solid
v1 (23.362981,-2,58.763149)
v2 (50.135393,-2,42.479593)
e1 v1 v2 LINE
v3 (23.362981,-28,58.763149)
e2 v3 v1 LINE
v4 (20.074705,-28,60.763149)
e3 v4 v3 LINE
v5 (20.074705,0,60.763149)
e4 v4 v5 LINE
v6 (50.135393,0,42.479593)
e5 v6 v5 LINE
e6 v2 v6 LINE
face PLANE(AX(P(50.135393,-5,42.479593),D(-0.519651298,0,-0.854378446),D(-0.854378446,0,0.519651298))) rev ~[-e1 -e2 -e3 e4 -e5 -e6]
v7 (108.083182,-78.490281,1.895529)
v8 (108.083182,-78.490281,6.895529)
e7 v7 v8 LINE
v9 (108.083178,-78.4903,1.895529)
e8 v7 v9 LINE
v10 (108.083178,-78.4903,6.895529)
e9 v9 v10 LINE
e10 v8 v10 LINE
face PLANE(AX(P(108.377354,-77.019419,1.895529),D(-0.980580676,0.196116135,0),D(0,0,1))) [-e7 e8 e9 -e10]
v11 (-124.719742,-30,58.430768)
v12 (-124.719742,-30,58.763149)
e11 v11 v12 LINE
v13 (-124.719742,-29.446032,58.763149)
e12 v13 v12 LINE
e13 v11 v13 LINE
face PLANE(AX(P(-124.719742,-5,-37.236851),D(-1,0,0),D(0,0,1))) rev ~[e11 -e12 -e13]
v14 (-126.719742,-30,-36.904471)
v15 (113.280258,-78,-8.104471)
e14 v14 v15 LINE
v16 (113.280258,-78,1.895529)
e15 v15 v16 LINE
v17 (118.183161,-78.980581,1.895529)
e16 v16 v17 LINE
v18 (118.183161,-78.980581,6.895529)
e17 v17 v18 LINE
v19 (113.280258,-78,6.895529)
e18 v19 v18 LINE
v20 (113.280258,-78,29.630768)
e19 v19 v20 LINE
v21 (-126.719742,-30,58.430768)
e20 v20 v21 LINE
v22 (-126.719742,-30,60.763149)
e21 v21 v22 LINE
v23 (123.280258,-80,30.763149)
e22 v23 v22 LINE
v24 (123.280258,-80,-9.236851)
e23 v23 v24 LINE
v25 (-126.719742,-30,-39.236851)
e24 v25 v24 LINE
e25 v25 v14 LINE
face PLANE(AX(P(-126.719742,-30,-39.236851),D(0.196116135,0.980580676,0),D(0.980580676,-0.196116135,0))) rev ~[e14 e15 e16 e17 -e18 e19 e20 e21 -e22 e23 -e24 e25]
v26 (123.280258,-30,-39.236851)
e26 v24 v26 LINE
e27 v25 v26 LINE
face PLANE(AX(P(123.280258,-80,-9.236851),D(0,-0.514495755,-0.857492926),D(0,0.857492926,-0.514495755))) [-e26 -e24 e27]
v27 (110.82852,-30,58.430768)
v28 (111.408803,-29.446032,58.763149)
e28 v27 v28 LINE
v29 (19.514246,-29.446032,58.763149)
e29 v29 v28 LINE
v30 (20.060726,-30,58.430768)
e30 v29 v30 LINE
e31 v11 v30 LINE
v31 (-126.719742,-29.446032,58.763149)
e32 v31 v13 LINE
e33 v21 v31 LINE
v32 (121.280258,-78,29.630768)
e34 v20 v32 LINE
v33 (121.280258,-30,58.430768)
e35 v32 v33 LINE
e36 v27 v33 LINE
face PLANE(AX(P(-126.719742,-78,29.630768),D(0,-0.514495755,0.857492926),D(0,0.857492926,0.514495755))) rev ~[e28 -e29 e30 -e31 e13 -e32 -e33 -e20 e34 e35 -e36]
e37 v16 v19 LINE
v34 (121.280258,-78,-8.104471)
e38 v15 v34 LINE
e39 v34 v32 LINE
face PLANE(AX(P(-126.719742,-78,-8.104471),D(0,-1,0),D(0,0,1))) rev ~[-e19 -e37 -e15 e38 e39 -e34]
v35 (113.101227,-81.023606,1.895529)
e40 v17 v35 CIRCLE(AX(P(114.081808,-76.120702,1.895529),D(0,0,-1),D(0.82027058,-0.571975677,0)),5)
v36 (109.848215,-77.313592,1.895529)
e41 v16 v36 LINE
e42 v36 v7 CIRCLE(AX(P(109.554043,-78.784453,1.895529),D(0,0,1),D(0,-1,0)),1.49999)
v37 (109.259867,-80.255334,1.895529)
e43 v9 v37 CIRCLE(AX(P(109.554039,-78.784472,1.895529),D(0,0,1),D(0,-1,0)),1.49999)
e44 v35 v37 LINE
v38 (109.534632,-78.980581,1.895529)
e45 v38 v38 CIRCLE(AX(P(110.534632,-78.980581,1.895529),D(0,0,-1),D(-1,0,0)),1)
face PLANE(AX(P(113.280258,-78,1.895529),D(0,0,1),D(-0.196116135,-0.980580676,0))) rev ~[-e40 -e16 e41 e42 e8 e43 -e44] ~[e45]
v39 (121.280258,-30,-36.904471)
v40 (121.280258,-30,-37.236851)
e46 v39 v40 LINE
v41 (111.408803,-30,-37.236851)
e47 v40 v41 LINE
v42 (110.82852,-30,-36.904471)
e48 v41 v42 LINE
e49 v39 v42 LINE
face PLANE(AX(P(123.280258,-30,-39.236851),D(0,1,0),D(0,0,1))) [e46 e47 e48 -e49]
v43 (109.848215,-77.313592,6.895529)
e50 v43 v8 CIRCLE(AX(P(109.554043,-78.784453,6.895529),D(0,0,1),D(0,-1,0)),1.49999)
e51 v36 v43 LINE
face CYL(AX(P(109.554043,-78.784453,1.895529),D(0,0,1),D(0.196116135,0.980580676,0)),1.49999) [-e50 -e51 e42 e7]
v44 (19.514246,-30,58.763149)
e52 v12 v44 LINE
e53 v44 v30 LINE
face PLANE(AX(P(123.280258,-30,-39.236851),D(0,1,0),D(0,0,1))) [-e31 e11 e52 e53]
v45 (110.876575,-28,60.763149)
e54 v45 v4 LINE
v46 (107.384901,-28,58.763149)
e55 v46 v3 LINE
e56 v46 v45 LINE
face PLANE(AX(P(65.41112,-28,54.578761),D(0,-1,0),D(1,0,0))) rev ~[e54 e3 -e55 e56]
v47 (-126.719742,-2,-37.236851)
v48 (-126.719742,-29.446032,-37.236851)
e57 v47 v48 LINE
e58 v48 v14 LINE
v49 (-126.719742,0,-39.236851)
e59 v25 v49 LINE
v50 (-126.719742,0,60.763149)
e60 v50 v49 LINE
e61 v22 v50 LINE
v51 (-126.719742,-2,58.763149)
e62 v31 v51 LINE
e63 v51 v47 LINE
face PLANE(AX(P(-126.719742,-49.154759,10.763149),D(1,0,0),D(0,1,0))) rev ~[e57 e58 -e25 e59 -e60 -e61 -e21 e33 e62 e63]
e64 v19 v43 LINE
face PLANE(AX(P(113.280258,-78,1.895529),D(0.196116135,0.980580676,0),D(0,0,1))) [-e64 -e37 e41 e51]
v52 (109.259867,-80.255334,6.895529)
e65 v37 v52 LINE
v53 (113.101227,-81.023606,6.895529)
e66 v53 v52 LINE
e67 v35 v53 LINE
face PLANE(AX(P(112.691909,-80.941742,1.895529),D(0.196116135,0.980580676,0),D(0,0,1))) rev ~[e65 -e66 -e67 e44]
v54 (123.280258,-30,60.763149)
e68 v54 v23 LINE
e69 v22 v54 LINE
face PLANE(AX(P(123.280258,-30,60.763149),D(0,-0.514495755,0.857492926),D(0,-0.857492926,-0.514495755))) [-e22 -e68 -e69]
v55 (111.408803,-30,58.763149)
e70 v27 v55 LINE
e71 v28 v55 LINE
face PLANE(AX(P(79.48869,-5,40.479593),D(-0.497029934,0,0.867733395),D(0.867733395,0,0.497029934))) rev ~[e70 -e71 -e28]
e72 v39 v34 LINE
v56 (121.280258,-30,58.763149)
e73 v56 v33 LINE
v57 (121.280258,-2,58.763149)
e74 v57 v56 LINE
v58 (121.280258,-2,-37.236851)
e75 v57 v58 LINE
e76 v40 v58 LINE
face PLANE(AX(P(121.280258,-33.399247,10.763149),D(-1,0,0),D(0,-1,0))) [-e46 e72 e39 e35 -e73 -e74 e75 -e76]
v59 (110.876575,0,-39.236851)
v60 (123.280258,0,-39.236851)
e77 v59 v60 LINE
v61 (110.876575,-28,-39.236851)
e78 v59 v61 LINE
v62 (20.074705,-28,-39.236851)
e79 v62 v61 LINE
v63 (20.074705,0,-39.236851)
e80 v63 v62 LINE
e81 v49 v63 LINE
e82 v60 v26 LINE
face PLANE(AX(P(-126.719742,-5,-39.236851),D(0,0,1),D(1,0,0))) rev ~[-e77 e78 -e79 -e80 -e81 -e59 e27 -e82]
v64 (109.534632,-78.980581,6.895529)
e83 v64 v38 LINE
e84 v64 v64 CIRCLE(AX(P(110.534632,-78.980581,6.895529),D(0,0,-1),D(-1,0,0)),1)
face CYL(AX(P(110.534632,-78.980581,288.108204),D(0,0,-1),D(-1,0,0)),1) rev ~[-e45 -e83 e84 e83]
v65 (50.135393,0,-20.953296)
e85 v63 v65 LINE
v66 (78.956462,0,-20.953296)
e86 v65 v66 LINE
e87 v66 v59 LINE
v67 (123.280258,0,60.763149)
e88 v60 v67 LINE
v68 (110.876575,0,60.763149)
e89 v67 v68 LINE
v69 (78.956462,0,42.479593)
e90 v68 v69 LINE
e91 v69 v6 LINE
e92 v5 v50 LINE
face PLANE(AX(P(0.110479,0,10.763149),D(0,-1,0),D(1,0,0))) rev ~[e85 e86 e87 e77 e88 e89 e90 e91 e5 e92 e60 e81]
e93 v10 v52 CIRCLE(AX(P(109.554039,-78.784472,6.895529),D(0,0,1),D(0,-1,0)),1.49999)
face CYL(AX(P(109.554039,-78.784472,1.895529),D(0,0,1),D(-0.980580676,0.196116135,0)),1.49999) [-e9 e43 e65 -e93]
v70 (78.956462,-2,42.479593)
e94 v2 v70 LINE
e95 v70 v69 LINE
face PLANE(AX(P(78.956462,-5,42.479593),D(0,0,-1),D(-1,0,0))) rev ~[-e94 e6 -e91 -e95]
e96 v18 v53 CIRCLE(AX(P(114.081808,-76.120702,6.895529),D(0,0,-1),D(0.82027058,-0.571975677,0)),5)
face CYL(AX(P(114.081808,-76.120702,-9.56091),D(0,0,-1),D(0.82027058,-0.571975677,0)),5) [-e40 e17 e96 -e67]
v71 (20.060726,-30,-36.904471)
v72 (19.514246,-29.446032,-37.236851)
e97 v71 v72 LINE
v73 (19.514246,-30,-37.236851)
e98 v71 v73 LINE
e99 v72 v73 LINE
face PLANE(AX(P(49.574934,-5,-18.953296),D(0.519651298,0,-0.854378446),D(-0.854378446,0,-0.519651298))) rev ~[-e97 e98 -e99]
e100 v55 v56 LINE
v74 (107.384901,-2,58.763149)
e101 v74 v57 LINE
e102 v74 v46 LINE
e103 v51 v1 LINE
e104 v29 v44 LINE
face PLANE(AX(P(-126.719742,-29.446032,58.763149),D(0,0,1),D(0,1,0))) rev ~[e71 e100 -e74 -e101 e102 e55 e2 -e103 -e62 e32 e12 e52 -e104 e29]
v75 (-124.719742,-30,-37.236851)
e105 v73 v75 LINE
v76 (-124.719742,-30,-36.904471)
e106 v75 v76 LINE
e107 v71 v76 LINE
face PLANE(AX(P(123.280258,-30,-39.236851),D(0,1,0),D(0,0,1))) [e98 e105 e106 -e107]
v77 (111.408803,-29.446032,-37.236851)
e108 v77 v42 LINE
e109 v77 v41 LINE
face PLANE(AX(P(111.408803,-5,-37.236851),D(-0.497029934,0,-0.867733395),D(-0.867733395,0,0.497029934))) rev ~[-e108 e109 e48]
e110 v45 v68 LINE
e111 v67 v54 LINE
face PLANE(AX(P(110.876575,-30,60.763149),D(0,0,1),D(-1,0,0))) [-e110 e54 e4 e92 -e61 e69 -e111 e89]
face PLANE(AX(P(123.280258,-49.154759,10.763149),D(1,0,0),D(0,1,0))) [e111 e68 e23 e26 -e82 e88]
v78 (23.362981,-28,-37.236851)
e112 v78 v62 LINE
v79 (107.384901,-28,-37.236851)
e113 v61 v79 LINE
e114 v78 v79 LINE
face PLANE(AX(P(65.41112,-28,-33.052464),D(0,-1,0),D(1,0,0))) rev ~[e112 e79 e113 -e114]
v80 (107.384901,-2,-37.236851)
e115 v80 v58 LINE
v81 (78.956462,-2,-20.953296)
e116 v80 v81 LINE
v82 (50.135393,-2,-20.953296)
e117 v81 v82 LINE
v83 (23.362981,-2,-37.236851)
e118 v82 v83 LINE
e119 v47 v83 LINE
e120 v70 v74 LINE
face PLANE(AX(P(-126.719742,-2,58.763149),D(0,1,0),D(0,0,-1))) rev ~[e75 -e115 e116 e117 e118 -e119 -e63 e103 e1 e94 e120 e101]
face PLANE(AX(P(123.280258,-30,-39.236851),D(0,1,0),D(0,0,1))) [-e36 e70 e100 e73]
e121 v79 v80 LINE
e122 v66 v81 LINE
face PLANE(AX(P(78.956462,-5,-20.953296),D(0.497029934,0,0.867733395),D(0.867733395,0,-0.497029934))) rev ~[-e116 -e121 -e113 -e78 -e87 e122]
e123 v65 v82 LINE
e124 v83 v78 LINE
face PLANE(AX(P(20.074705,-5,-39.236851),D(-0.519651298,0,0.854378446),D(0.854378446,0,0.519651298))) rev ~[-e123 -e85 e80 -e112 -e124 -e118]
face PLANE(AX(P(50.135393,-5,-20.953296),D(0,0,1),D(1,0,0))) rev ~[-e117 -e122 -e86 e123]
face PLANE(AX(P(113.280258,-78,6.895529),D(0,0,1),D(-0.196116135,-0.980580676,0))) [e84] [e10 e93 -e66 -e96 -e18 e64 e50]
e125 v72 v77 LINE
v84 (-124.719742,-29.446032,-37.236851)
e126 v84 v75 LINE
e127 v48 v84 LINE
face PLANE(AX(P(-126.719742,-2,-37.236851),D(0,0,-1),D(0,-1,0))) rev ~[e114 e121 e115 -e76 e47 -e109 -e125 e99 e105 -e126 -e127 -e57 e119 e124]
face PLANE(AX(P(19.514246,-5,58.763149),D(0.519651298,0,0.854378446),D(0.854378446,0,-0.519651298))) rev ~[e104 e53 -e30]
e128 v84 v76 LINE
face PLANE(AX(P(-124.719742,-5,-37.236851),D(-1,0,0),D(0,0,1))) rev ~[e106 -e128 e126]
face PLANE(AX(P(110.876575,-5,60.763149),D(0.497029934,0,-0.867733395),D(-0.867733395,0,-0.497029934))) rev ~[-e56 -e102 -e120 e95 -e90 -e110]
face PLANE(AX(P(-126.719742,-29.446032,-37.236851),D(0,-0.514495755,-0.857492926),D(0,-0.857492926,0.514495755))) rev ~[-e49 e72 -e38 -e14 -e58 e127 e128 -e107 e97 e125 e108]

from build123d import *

# Parameters (mm, degrees)
F1_DEPTH     = 5
F3_DEPTH     = 25
F5_DEPTH     = 2
F7_DEPTH     = 250
F9_DEPTH     = 248
F11_DEPTH    = 110
F13_W        = 5
F13_H        = 5
F14_DEPTH    = 3
F15_T1_DEPTH = 27.9128784748
F16_DEPTH    = 5
F18_D        = 2
F19_R        = 1.49999


# Not quite as in the source:
# - a fillet or chamfer that OpenCascade refuses, or shapes differently, is made with other operations: its cross-section is extruded or revolved along the edge and cut away or added
# - a fillet or chamfer is up to 0.001 mm smaller than in the source, because OpenCascade refuses the exact size


with BuildPart() as f1:
    # F0 (on Front) → F1 (new body)
    with BuildSketch(Plane.XZ):
        Polygon((20.074704662, 60.7631485909), (-126.7197424916, 60.7631485909), (-126.7197424916, 10.7631485909), (-126.7197424916, -39.2368514091), (20.074704662, -39.2368514091), (50.1353926957, -20.9532961249), (78.9564624429, -20.9532961249), (110.8765751123, -39.2368514091), (123.2802575084, -39.2368514091), (123.2802575084, 10.7631485909), (123.2802575084, 60.7631485909), (110.8765751123, 60.7631485909), (78.9564624429, 42.4795933068), (50.1353926957, 42.4795933068), align=None)
    extrude(amount=F1_DEPTH)

    # F2 (on face) → F3 (join)
    with BuildSketch(Plane.XZ.offset(5)):
        Polygon((-126.7197424916, -39.2368514091), (20.074704662, -39.2368514091), (50.1353926957, -20.9532961249), (78.9564624429, -20.9532961249), (110.8765751123, -39.2368514091), (123.2802575084, -39.2368514091), (123.2802575084, 60.7631485909), (110.8765751123, 60.7631485909), (78.9564624429, 42.4795933068), (50.1353926957, 42.4795933068), (20.074704662, 60.7631485909), (-126.7197424916, 60.7631485909), align=None)
        Polygon((49.574933962, -18.9532961249), (19.5142459283, -37.2368514091), (-124.7197424916, -37.2368514091), (-124.7197424916, 58.7631485909), (19.5142459283, 58.7631485909), (49.574933962, 40.4795933068), (79.4886903674, 40.4795933068), (111.4088030368, 58.7631485909), (121.2802575084, 58.7631485909), (121.2802575084, -37.2368514091), (111.4088030368, -37.2368514091), (79.4886903674, -18.9532961249), align=None, mode=Mode.SUBTRACT)
    extrude(amount=F3_DEPTH)

    # F4 (on face) → F5 (join)
    with BuildSketch(Plane.XZ.offset(30)):
        Polygon((110.8765751123, 60.7631485909), (20.074704662, 60.7631485909), (50.1353926957, 42.4795933068), (78.9564624429, 42.4795933068), align=None)
        Polygon((50.1353926957, -20.9532961249), (20.074704662, -39.2368514091), (110.8765751123, -39.2368514091), (78.9564624429, -20.9532961249), align=None)
    extrude(amount=-F5_DEPTH)

    # F6 (on face) → F7 (join)
    with BuildSketch(Plane.YZ.offset(123.2802575084)):
        Polygon((-80, -9.2368514091), (-30, -39.2368514091), (-30, 60.7631485909), (-80, 30.7631485909), align=None)
    extrude(amount=-F7_DEPTH)

    # F8 (on face) → F9 (cut)
    with BuildSketch(Plane(origin=(-126.7197424916, 0, 0), x_dir=(0, -1, 0), z_dir=(-1, 0, 0))):
        Polygon((78, 29.630767833), (29.4460320701, 58.7631485909), (2, 58.7631485909), (2, -37.2368514091), (29.4460320701, -37.2368514091), (78, -8.1044706511), align=None)
    extrude(amount=-F9_DEPTH, mode=Mode.SUBTRACT)

    # F10 (on face) → F11 (cut)
    with BuildSketch(Plane(origin=(0, 0, -39.2368514091), x_dir=(1, 0, 0), z_dir=(0, 0, -1))):
        Polygon((-126.7197424916, 80), (-126.7197424916, 30), (123.2802575084, 80), align=None)
    extrude(amount=-F11_DEPTH, mode=Mode.SUBTRACT)

    # F13 (on face) → F14 (join)
    with BuildSketch(Plane(origin=(-10.6430670189, -53.2153350945, 0), x_dir=(0.9805806757, -0.1961161351, 0), z_dir=(-0.1961161351, -0.9805806757, 0))):
        with Locations((128.8774899908, 4.3955293489)):
            Rectangle(F13_W, F13_H)
    extrude(amount=F14_DEPTH)

    # F15: fillet of radius 5 on 1 edges, made by hand

    # F15_s2 → F15_t1 (cut)
    with BuildSketch(Plane.XY.offset(-9.5609098885)):
        with BuildLine():
            ThreePointArc((118.1831608869, -78.9805806757), (115.9468261093, -80.7598517163), (113.1012273101, -81.0236056685))
            Line((113.1012273101, -81.0236056685), (117.5948124814, -81.9223227028))
            Line((117.5948124814, -81.9223227028), (118.1831608869, -78.9805806757))
        make_face()
    extrude(amount=F15_T1_DEPTH, mode=Mode.SUBTRACT)

    # F16 (add): a face of the model
    f16_faces = [f1.faces().sort_by_distance(p)[0] for p in [
        (112.9860833057, -79.4708710135, 4.3955293489),
    ]]
    extrude(f16_faces, amount=F16_DEPTH)

    # F18 (through all)
    with Locations(Plane.XY.offset(6.8955293489)):
        with Locations((110.5346316165, -78.9805806757)):
            Hole(F18_D / 2)

    # F19 (radius 1.5 in the source; OpenCascade refuses exactly that, so slightly less here)
    f19_edges = [f1.edges().sort_by_distance(p)[0] for p in [
        (108.377354, -77.019419, 4.395529),
        (107.789006, -79.961161, 4.395529),
    ]]
    fillet(f19_edges, radius=F19_R)


solid = f1.part
